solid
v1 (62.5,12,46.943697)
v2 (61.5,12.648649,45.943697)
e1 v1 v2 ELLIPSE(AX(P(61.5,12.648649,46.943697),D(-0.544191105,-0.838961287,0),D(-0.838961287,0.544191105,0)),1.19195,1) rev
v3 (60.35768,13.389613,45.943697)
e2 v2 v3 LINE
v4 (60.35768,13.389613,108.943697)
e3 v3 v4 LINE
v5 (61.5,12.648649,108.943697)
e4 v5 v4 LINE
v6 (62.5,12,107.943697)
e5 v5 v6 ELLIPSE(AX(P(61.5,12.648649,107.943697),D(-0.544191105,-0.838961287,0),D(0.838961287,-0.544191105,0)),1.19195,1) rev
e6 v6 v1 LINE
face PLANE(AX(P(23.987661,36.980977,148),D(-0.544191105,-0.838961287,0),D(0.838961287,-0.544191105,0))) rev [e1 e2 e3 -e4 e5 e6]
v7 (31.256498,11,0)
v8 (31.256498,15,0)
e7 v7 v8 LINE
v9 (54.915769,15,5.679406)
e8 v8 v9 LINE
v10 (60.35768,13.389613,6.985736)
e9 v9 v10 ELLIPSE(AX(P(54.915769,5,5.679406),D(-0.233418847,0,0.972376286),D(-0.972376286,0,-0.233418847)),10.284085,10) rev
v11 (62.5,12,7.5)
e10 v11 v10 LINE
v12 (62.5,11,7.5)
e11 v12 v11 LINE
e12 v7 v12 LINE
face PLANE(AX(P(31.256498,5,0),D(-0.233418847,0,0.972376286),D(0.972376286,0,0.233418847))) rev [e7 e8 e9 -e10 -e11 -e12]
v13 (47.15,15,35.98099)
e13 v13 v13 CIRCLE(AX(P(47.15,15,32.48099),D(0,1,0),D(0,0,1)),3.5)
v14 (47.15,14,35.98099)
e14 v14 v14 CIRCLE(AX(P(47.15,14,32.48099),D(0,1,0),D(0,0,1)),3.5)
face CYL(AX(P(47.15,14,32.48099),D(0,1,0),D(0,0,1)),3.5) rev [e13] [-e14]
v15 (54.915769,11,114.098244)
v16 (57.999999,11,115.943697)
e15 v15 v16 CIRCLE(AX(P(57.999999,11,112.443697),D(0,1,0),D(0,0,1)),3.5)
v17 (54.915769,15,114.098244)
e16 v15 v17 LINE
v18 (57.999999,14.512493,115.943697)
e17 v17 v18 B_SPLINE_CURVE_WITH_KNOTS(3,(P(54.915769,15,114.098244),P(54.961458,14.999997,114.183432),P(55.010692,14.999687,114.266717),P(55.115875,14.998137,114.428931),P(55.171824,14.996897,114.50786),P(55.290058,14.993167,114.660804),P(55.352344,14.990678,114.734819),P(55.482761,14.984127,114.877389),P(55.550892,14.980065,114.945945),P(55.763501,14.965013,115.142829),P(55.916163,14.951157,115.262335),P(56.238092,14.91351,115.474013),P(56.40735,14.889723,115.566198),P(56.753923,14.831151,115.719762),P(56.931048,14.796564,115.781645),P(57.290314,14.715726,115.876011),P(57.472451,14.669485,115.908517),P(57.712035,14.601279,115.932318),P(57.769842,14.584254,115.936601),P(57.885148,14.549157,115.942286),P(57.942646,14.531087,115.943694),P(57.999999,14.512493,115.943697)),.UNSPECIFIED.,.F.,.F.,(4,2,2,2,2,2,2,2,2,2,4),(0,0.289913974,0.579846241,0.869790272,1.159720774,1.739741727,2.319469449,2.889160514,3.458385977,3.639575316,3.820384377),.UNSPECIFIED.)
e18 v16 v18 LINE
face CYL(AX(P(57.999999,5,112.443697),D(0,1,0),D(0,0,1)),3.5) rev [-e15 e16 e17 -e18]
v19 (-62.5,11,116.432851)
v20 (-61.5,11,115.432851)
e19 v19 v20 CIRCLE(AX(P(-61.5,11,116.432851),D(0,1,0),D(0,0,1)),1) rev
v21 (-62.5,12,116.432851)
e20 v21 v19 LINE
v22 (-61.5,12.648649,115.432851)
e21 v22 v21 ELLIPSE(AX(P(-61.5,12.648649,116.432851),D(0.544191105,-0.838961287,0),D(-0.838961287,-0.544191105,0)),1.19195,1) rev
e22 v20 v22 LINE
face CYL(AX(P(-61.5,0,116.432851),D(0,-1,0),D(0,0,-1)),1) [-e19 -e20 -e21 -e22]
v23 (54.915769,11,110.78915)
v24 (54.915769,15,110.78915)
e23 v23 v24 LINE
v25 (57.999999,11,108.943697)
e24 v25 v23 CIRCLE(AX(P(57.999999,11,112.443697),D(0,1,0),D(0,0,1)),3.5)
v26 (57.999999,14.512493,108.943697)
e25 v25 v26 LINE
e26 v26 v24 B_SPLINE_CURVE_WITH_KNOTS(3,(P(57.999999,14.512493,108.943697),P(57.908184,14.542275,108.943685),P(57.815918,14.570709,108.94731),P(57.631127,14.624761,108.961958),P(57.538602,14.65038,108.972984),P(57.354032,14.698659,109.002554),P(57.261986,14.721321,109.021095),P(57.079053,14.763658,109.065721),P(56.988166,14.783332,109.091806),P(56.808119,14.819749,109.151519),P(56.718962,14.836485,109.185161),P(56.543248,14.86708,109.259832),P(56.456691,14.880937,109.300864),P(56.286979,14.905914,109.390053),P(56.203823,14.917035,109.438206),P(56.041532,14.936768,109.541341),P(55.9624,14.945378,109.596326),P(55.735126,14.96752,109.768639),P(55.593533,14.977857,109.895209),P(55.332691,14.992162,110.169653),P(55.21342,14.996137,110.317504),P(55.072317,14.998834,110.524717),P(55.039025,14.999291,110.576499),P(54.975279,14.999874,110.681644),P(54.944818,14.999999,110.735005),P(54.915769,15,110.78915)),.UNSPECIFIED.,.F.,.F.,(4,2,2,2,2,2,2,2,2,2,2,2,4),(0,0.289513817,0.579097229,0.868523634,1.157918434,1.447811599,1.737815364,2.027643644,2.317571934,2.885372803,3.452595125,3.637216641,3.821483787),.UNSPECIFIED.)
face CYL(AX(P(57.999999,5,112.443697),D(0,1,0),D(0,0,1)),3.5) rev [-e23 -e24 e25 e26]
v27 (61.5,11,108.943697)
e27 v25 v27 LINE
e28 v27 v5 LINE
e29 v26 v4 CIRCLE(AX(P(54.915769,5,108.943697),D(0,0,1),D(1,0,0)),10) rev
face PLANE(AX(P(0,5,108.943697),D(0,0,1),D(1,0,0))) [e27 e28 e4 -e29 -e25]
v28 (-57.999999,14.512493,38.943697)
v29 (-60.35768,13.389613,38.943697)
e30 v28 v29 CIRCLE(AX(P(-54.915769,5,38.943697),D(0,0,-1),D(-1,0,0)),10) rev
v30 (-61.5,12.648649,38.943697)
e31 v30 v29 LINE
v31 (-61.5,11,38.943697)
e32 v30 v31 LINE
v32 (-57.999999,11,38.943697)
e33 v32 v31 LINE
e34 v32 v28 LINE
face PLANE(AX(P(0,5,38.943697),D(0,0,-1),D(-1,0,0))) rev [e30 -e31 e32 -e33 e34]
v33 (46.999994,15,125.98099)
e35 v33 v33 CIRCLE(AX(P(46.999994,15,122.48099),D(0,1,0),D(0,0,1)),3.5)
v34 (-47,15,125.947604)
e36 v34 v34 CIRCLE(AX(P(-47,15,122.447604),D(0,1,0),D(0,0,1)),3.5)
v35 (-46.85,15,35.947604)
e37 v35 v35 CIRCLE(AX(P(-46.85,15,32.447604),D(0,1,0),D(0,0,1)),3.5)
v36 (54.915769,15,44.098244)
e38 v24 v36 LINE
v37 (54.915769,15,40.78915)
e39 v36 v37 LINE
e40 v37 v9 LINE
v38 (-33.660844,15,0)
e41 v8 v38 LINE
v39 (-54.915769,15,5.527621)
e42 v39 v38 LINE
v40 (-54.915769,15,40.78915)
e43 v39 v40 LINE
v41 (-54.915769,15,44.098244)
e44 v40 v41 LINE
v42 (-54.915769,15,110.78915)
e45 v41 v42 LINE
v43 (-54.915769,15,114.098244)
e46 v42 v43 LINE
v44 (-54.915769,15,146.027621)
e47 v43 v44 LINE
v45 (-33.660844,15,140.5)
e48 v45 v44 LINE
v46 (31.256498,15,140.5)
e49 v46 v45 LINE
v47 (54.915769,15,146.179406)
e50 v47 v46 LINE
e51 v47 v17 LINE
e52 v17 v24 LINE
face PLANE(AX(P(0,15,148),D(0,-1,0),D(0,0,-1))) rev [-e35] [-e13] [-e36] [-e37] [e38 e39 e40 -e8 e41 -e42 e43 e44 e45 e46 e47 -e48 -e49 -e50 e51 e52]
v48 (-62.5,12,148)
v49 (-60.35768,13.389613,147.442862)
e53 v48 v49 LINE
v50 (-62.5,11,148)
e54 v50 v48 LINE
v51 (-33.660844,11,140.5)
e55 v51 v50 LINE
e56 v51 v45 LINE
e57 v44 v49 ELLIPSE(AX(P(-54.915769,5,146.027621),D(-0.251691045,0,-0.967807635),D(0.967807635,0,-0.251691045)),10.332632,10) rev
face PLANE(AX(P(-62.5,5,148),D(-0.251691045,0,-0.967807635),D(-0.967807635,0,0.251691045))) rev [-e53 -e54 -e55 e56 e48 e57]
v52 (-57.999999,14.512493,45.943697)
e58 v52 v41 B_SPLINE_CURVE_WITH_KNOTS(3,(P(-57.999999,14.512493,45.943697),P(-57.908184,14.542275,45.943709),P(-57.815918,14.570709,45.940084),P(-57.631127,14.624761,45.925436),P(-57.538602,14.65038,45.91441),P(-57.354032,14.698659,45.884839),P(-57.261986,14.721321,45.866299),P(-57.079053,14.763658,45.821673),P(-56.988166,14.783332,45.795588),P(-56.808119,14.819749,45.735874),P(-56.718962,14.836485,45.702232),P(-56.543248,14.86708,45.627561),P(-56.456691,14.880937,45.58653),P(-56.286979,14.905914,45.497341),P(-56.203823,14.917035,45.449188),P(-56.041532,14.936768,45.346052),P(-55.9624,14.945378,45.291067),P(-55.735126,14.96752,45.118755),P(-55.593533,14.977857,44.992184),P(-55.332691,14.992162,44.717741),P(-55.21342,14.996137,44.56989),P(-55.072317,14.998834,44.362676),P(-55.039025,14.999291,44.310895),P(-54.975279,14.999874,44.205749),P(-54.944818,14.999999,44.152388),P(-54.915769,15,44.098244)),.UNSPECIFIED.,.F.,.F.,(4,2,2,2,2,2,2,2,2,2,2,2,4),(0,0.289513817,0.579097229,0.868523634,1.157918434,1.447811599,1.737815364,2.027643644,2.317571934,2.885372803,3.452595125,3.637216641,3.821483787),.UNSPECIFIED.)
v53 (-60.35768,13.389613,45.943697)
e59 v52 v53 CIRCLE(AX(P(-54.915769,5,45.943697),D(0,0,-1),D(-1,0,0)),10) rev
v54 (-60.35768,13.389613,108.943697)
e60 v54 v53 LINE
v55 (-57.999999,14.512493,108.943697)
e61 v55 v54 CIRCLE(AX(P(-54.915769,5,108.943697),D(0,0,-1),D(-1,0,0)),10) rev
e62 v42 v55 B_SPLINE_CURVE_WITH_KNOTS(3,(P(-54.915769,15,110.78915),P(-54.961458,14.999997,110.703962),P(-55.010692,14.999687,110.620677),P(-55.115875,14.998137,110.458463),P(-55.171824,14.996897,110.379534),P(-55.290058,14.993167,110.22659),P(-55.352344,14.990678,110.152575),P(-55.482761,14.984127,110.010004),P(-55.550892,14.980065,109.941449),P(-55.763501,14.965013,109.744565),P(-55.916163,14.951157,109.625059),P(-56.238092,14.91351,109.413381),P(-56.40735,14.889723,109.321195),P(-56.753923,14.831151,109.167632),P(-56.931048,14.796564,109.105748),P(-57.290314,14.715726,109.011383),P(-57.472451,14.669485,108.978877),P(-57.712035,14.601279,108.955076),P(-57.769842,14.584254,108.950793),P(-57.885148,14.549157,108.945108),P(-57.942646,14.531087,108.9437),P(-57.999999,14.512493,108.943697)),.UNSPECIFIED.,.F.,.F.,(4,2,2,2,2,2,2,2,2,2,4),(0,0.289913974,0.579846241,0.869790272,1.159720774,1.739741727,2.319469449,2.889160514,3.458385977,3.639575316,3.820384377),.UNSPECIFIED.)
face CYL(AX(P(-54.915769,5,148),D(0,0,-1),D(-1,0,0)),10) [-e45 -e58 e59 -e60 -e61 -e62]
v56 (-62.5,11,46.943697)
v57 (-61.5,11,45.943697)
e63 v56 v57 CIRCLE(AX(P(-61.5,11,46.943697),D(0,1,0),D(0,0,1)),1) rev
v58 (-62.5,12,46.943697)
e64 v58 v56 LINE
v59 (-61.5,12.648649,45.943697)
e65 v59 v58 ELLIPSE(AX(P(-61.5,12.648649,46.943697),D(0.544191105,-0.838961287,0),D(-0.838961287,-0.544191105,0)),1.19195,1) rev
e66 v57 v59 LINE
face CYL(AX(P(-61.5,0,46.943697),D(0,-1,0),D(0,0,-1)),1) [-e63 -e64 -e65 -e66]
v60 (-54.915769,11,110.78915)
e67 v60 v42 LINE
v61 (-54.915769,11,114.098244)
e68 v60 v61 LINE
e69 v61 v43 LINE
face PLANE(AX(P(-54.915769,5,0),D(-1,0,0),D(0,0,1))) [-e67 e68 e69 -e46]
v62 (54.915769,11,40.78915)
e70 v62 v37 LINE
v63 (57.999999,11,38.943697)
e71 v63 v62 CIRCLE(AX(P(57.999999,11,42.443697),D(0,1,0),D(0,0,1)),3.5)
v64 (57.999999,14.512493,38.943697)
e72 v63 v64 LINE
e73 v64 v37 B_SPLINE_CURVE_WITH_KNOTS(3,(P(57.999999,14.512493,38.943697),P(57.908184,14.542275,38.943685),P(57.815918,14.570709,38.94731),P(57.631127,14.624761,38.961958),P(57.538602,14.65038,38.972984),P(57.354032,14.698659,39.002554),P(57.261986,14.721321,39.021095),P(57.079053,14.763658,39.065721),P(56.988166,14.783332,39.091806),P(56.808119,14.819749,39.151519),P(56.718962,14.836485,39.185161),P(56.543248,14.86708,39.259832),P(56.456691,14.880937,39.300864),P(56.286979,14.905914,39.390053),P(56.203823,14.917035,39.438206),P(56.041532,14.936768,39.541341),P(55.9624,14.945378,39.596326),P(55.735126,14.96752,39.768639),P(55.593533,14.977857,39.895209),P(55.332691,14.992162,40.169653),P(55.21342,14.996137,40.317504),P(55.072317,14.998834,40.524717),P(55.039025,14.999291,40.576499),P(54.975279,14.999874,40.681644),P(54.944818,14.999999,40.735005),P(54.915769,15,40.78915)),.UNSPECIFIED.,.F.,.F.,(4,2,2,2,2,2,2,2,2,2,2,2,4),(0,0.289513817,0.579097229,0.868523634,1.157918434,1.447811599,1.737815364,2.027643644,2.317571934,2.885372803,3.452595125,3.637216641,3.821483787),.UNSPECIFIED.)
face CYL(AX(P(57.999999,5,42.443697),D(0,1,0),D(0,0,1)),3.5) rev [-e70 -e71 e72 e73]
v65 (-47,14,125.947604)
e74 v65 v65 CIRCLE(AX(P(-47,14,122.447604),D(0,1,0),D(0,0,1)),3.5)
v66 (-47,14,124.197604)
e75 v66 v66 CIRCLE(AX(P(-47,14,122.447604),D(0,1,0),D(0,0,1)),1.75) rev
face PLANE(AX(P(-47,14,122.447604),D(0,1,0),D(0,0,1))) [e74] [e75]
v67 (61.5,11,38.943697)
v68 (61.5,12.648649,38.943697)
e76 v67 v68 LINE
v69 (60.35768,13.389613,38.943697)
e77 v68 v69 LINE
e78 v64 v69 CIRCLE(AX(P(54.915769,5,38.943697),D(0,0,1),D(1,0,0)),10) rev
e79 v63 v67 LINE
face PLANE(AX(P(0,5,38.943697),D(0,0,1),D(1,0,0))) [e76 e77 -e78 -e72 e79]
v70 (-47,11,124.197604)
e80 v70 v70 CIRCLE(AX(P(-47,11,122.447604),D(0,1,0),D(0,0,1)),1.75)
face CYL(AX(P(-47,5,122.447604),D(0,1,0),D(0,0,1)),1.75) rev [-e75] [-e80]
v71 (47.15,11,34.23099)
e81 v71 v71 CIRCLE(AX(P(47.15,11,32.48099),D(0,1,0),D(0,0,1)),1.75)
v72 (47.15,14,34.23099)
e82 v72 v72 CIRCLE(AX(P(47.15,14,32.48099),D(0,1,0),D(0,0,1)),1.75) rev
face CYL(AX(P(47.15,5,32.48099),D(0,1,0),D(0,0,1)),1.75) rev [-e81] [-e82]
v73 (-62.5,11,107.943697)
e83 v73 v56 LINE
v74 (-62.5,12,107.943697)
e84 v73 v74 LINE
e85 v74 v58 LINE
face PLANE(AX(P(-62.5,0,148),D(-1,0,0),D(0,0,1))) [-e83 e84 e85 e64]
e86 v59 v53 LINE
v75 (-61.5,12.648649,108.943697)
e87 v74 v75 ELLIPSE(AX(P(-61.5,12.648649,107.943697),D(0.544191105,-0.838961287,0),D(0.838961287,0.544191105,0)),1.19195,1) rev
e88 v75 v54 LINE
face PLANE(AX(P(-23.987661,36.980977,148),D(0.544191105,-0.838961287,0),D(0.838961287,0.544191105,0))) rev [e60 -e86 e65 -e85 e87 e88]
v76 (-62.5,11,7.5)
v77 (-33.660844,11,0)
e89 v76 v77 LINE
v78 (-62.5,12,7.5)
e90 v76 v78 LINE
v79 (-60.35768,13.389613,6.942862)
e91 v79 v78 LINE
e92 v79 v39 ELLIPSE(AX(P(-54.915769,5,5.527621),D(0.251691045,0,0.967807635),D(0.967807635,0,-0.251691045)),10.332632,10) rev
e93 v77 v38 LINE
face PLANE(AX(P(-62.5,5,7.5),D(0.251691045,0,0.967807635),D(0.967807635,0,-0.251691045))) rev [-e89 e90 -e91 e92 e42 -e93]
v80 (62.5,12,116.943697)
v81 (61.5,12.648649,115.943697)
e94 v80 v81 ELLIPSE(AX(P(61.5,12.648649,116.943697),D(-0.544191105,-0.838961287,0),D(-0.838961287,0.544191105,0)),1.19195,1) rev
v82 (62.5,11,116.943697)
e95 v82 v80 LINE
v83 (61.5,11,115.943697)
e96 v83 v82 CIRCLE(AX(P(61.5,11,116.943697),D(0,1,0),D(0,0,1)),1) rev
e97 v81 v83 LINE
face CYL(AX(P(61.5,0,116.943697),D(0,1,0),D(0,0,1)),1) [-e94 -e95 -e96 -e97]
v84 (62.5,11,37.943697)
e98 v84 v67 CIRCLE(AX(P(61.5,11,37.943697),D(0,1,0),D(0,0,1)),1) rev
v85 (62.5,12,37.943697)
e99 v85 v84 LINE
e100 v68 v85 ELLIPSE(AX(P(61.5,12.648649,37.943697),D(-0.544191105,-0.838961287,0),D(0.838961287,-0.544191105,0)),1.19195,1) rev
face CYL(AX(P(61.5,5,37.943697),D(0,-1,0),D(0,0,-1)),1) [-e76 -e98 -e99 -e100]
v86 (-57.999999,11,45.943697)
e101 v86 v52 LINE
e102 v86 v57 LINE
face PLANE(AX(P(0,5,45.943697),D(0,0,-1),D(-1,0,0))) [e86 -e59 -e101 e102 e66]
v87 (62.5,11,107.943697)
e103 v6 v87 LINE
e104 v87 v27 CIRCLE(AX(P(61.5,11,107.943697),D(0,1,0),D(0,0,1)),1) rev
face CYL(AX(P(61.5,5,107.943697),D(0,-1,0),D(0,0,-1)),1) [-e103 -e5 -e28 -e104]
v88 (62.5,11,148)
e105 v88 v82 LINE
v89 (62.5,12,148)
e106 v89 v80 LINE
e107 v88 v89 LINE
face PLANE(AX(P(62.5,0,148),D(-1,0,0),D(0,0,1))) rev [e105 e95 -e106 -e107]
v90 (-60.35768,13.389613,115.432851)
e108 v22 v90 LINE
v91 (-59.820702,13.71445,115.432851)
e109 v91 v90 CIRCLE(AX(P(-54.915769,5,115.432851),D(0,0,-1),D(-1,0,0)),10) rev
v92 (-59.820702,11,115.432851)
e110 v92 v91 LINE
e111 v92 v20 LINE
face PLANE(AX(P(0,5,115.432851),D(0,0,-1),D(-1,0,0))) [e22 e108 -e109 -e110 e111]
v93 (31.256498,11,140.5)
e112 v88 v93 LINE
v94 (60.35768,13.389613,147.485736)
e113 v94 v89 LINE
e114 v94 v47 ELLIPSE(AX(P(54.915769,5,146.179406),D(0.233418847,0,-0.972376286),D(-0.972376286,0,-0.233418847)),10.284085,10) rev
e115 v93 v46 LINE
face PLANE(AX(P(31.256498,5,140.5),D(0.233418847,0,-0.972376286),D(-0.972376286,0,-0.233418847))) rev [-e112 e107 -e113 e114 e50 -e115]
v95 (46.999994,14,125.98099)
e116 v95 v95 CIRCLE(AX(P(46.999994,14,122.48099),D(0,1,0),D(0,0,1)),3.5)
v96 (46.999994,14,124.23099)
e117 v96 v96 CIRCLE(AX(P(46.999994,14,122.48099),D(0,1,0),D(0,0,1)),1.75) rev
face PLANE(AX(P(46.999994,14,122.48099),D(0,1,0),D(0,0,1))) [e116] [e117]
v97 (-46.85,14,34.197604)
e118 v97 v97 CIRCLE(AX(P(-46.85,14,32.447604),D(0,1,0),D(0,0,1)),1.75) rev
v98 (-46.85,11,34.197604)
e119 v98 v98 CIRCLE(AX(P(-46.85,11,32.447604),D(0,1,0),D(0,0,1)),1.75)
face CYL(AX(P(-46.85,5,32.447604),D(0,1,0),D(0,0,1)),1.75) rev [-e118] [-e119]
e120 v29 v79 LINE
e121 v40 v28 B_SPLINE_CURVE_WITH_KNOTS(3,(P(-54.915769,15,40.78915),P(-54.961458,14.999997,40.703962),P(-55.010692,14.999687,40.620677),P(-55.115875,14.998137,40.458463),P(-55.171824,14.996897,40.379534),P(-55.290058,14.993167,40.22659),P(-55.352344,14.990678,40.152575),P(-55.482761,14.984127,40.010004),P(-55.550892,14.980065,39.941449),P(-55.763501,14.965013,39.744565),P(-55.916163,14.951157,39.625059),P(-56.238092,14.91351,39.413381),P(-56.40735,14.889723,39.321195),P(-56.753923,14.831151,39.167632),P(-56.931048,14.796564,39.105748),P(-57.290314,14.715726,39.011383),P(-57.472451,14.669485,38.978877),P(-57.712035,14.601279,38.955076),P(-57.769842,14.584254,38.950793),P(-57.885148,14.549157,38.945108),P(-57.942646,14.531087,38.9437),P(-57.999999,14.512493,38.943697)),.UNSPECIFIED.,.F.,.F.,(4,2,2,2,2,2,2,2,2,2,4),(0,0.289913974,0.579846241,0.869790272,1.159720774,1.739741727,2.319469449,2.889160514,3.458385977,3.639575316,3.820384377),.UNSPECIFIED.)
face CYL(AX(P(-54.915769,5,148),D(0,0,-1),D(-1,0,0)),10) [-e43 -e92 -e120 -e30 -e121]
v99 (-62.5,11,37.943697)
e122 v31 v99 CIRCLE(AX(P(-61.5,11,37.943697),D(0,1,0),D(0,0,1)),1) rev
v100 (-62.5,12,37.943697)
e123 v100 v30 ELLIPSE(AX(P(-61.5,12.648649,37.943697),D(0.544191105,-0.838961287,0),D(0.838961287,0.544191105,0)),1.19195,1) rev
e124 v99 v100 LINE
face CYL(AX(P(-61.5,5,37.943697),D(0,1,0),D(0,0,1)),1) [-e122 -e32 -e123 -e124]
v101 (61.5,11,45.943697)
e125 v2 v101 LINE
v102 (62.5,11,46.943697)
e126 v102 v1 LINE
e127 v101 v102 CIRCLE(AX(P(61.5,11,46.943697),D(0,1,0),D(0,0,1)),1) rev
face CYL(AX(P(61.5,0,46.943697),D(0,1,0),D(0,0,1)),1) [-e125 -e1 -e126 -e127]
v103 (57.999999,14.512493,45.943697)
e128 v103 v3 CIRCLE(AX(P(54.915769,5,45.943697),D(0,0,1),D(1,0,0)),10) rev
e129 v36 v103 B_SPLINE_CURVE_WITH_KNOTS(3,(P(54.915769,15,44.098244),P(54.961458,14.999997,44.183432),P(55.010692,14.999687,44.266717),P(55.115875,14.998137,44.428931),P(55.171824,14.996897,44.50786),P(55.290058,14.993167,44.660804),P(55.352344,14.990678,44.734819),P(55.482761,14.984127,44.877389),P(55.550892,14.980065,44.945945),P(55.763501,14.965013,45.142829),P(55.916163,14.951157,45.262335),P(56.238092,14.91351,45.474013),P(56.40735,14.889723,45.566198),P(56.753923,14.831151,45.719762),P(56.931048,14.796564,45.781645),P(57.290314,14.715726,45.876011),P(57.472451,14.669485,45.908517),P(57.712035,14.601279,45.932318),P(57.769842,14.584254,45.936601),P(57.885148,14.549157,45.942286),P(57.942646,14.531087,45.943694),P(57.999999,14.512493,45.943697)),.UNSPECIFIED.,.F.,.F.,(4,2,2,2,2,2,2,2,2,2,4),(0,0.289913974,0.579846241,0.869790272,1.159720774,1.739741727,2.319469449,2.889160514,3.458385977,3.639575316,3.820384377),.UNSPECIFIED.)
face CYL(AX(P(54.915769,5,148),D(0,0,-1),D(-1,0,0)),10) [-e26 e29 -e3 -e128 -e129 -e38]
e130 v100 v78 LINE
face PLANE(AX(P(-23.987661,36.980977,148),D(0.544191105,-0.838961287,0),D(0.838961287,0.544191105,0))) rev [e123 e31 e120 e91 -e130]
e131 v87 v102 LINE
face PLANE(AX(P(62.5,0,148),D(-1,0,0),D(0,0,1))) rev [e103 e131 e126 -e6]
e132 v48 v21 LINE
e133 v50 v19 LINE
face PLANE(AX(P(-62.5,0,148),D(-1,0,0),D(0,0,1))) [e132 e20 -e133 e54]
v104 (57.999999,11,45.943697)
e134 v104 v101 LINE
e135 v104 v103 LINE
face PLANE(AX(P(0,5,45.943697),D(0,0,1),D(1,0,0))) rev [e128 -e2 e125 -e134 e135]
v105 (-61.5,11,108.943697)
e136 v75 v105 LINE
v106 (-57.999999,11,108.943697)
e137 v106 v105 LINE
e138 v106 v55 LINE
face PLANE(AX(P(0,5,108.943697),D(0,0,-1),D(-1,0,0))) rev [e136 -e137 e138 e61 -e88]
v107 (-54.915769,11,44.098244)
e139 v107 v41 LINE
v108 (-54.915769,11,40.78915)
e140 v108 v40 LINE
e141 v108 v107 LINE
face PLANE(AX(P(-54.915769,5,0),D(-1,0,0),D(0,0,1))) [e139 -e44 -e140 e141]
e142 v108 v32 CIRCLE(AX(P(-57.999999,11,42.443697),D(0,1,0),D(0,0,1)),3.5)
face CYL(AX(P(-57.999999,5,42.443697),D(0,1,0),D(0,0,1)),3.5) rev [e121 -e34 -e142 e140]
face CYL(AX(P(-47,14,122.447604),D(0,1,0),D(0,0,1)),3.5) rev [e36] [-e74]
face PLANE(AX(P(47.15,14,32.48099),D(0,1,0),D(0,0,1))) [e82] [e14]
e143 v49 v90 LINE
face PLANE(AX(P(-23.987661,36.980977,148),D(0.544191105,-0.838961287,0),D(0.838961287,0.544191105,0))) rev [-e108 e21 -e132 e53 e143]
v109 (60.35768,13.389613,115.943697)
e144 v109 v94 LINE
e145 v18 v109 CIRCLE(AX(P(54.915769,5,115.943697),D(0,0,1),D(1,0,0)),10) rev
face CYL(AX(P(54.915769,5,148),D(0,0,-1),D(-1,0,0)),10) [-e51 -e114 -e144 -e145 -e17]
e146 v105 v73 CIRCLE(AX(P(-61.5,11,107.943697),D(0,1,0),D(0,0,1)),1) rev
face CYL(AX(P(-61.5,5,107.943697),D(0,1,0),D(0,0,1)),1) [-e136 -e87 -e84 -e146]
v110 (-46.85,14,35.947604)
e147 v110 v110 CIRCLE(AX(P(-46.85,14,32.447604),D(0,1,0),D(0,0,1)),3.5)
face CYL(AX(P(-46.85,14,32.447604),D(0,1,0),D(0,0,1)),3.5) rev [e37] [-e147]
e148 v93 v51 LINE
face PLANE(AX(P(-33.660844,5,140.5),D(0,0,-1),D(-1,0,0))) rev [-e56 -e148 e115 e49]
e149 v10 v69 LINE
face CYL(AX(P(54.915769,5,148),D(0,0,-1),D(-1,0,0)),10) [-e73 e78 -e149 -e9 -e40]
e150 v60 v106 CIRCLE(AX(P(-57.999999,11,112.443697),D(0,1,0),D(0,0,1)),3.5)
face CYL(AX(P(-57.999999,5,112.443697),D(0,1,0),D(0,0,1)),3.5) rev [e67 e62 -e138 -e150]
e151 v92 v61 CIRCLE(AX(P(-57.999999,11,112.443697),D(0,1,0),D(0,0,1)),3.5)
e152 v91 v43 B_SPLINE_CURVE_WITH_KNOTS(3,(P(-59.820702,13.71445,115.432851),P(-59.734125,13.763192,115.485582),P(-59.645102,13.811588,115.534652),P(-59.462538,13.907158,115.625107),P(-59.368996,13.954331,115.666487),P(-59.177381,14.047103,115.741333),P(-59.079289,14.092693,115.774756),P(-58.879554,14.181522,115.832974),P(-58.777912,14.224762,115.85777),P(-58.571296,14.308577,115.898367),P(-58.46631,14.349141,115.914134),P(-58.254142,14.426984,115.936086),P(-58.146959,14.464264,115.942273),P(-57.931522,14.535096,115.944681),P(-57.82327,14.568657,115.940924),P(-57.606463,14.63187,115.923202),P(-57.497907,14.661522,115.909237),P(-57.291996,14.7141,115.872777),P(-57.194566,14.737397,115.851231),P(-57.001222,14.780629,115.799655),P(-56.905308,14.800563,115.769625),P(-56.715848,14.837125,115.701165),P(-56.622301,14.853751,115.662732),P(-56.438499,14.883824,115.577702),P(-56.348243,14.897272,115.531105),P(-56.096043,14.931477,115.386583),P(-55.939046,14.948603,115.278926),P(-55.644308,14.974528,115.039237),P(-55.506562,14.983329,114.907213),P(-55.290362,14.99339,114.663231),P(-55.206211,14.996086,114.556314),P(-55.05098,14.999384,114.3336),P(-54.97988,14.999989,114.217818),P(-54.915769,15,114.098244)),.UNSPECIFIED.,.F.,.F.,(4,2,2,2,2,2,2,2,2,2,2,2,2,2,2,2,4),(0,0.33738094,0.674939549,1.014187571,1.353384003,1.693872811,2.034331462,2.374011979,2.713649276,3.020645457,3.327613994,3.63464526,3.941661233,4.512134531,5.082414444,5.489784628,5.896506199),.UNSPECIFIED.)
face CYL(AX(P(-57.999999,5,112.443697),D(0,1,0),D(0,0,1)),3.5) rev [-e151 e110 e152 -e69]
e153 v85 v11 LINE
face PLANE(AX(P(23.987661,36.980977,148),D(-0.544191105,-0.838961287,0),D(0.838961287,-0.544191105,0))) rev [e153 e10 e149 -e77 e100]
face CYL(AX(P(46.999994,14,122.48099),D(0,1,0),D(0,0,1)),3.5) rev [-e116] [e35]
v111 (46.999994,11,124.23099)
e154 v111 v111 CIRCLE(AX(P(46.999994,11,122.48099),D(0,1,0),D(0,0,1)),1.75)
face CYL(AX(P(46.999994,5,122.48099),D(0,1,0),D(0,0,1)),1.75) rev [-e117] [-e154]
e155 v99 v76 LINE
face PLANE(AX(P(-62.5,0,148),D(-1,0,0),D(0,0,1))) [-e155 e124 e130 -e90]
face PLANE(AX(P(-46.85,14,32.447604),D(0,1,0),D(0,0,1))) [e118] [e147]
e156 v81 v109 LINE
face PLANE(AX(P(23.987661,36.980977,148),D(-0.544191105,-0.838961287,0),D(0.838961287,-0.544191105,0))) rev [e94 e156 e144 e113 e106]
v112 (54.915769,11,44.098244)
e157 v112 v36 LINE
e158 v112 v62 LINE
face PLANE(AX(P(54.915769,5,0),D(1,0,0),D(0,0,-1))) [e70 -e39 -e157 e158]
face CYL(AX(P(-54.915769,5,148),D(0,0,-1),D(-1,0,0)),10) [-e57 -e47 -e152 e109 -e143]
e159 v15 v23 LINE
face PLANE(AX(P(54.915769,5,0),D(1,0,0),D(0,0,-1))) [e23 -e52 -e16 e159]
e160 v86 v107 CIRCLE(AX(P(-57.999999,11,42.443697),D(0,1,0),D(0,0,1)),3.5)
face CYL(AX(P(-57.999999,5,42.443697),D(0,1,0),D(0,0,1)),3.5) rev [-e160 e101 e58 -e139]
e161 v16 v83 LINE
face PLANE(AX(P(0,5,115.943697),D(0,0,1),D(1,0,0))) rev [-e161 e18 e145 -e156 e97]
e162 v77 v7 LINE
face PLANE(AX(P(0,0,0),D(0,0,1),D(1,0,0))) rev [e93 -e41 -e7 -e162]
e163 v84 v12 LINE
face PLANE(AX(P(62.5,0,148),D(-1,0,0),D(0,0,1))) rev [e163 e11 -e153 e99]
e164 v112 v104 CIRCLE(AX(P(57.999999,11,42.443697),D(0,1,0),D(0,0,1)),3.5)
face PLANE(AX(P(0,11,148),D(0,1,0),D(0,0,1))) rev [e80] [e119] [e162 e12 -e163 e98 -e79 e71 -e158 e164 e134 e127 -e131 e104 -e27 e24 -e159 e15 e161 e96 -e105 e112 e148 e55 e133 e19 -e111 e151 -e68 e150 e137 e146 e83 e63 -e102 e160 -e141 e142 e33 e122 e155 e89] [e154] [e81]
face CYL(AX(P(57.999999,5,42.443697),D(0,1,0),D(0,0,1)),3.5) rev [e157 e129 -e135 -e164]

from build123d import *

# Parameters (mm, degrees)
BOSS_EXTRUDE1_DEPTH    = 148
FILLET1_R              = 10
CUT_EXTRUDE1_DEPTH     = 10
CUT_EXTRUDE2_START     = -4
CUT_EXTRUDE2_OUTLINE_R = 1.75
CUT_EXTRUDE2_DEPTH     = 4
SKETCH4_R              = 3.5
CUT_EXTRUDE3_DEPTH     = 1
FILLET2_R              = 1


# Read off the part's stored shape, not the designer's step: Cut-Extrude2
with BuildPart() as part:
    # Sketch1 → Boss-Extrude1 (new body)
    with BuildSketch(Plane.XY):
        Polygon((57.875, 15), (-57.875, 15), (-62.5, 12), (-62.5, 11), (62.5, 11), (62.5, 12), align=None)
    extrude(amount=BOSS_EXTRUDE1_DEPTH)

    # Fillet1
    fillet1_edges = [part.edges().sort_by_distance(p)[0] for p in [
        (-57.875, 15, 74),
        (57.875, 15, 74),
    ]]
    fillet(fillet1_edges, radius=FILLET1_R)

    # Sketch2 → Cut-Extrude1 (cut)
    with BuildSketch(Plane(origin=(0, 15, 0), x_dir=(1, 0, 0), z_dir=(0, 1, 0))):
        Polygon((-62.5, -7.5), (-33.66084425, 0), (31.256498232, 0), (62.5, -7.5), (62.5, 0), (31.256498232, 7.5), (-33.66084425, 7.5), (-62.5, 0), align=None)
        Polygon((31.256498232, -148), (62.5, -155.5), (62.5, -148), (31.256498232, -140.5), (-33.66084425, -140.5), (-62.5, -148), (-62.5, -155.5), (-33.66084425, -148), align=None)
    extrude(amount=-CUT_EXTRUDE1_DEPTH, mode=Mode.SUBTRACT)

    # Cut-Extrude2 outline → Cut-Extrude2 (cut)
    with BuildSketch(Plane(origin=(0, 15, 0), x_dir=(1, 0, 0), z_dir=(0, 1, 0)).offset(CUT_EXTRUDE2_START)):
        with BuildLine():
            Line((-62.5, -38.943696852), (-62.5, -45.943696852))
            Line((-62.5, -45.943696852), (-57.999999085, -45.943696852))
            ThreePointArc((-57.999999085, -45.943696852), (-56.202906175, -45.447104429), (-54.915769107, -44.098243751))
            Line((-54.915769107, -44.098243751), (-54.915769107, -40.789149953))
            ThreePointArc((-54.915769107, -40.789149953), (-56.202906175, -39.440289275), (-57.999999085, -38.943696852))
            Line((-57.999999085, -38.943696852), (-62.5, -38.943696852))
        make_face()
        with BuildLine():
            Line((-62.5, -115.432850877), (-59.820701756, -115.432850877))
            ThreePointArc((-59.820701756, -115.432850877), (-57.081076151, -115.820911776), (-54.915769107, -114.098243751))
            Line((-54.915769107, -114.098243751), (-54.915769107, -110.789149953))
            ThreePointArc((-54.915769107, -110.789149953), (-56.202906175, -109.440289275), (-57.999999085, -108.943696852))
            Line((-57.999999085, -108.943696852), (-62.5, -108.943696852))
            Line((-62.5, -108.943696852), (-62.5, -115.432850877))
        make_face()
        with BuildLine():
            Line((57.999999085, -45.943696852), (62.5, -45.943696852))
            Line((62.5, -45.943696852), (62.5, -38.943696852))
            Line((62.5, -38.943696852), (57.999999085, -38.943696852))
            ThreePointArc((57.999999085, -38.943696852), (56.202906175, -39.440289275), (54.915769107, -40.789149953))
            Line((54.915769107, -40.789149953), (54.915769107, -44.098243751))
            ThreePointArc((54.915769107, -44.098243751), (56.202906175, -45.447104429), (57.999999085, -45.943696852))
        make_face()
        with BuildLine():
            Line((62.5, -108.943696852), (57.999999085, -108.943696852))
            ThreePointArc((57.999999085, -108.943696852), (56.202906175, -109.440289275), (54.915769107, -110.789149953))
            Line((54.915769107, -110.789149953), (54.915769107, -114.098243751))
            ThreePointArc((54.915769107, -114.098243751), (56.202906175, -115.447104429), (57.999999085, -115.943696852))
            Line((57.999999085, -115.943696852), (62.5, -115.943696852))
            Line((62.5, -115.943696852), (62.5, -108.943696852))
        make_face()
        with Locations((47.15, -32.480990458)):
            Circle(CUT_EXTRUDE2_OUTLINE_R)
        with Locations((-47, -122.447604366)):
            Circle(CUT_EXTRUDE2_OUTLINE_R)
        with Locations((46.999994071, -122.480990458)):
            Circle(CUT_EXTRUDE2_OUTLINE_R)
        with Locations((-46.85, -32.447604366)):
            Circle(CUT_EXTRUDE2_OUTLINE_R)
    extrude(amount=CUT_EXTRUDE2_DEPTH, mode=Mode.SUBTRACT)

    # Sketch4 → Cut-Extrude3 (cut)
    with BuildSketch(Plane(origin=(0, 15, 0), x_dir=(1, 0, 0), z_dir=(0, 1, 0))):
        with Locations(Location((-46.85, -32.447604366, 0), (0, 0, 270))):
            Circle(SKETCH4_R)
        with Locations(Location((47.15, -32.480990458, 0), (0, 0, 270))):
            Circle(SKETCH4_R)
        with Locations(Location((-47, -122.447604366, 0), (0, 0, 270))):
            Circle(SKETCH4_R)
        with Locations(Location((46.999994071, -122.480990458, 0), (0, 0, 270))):
            Circle(SKETCH4_R)
    extrude(amount=-CUT_EXTRUDE3_DEPTH, mode=Mode.SUBTRACT)

    # Fillet2
    fillet2_edges = [part.edges().sort_by_distance(p)[0] for p in [
        (62.5, 11.5, 115.943696852),
        (62.5, 11.5, 108.943696852),
        (-62.5, 11.5, 45.943696852),
        (-62.5, 11.5, 38.943696852),
        (-62.5, 11.5, 115.432850877),
        (-62.5, 11.5, 108.943696852),
        (62.5, 11.5, 45.943696852),
        (62.5, 11.5, 38.943696852),
    ]]
    fillet(fillet2_edges, radius=FILLET2_R)


solid = part.part
